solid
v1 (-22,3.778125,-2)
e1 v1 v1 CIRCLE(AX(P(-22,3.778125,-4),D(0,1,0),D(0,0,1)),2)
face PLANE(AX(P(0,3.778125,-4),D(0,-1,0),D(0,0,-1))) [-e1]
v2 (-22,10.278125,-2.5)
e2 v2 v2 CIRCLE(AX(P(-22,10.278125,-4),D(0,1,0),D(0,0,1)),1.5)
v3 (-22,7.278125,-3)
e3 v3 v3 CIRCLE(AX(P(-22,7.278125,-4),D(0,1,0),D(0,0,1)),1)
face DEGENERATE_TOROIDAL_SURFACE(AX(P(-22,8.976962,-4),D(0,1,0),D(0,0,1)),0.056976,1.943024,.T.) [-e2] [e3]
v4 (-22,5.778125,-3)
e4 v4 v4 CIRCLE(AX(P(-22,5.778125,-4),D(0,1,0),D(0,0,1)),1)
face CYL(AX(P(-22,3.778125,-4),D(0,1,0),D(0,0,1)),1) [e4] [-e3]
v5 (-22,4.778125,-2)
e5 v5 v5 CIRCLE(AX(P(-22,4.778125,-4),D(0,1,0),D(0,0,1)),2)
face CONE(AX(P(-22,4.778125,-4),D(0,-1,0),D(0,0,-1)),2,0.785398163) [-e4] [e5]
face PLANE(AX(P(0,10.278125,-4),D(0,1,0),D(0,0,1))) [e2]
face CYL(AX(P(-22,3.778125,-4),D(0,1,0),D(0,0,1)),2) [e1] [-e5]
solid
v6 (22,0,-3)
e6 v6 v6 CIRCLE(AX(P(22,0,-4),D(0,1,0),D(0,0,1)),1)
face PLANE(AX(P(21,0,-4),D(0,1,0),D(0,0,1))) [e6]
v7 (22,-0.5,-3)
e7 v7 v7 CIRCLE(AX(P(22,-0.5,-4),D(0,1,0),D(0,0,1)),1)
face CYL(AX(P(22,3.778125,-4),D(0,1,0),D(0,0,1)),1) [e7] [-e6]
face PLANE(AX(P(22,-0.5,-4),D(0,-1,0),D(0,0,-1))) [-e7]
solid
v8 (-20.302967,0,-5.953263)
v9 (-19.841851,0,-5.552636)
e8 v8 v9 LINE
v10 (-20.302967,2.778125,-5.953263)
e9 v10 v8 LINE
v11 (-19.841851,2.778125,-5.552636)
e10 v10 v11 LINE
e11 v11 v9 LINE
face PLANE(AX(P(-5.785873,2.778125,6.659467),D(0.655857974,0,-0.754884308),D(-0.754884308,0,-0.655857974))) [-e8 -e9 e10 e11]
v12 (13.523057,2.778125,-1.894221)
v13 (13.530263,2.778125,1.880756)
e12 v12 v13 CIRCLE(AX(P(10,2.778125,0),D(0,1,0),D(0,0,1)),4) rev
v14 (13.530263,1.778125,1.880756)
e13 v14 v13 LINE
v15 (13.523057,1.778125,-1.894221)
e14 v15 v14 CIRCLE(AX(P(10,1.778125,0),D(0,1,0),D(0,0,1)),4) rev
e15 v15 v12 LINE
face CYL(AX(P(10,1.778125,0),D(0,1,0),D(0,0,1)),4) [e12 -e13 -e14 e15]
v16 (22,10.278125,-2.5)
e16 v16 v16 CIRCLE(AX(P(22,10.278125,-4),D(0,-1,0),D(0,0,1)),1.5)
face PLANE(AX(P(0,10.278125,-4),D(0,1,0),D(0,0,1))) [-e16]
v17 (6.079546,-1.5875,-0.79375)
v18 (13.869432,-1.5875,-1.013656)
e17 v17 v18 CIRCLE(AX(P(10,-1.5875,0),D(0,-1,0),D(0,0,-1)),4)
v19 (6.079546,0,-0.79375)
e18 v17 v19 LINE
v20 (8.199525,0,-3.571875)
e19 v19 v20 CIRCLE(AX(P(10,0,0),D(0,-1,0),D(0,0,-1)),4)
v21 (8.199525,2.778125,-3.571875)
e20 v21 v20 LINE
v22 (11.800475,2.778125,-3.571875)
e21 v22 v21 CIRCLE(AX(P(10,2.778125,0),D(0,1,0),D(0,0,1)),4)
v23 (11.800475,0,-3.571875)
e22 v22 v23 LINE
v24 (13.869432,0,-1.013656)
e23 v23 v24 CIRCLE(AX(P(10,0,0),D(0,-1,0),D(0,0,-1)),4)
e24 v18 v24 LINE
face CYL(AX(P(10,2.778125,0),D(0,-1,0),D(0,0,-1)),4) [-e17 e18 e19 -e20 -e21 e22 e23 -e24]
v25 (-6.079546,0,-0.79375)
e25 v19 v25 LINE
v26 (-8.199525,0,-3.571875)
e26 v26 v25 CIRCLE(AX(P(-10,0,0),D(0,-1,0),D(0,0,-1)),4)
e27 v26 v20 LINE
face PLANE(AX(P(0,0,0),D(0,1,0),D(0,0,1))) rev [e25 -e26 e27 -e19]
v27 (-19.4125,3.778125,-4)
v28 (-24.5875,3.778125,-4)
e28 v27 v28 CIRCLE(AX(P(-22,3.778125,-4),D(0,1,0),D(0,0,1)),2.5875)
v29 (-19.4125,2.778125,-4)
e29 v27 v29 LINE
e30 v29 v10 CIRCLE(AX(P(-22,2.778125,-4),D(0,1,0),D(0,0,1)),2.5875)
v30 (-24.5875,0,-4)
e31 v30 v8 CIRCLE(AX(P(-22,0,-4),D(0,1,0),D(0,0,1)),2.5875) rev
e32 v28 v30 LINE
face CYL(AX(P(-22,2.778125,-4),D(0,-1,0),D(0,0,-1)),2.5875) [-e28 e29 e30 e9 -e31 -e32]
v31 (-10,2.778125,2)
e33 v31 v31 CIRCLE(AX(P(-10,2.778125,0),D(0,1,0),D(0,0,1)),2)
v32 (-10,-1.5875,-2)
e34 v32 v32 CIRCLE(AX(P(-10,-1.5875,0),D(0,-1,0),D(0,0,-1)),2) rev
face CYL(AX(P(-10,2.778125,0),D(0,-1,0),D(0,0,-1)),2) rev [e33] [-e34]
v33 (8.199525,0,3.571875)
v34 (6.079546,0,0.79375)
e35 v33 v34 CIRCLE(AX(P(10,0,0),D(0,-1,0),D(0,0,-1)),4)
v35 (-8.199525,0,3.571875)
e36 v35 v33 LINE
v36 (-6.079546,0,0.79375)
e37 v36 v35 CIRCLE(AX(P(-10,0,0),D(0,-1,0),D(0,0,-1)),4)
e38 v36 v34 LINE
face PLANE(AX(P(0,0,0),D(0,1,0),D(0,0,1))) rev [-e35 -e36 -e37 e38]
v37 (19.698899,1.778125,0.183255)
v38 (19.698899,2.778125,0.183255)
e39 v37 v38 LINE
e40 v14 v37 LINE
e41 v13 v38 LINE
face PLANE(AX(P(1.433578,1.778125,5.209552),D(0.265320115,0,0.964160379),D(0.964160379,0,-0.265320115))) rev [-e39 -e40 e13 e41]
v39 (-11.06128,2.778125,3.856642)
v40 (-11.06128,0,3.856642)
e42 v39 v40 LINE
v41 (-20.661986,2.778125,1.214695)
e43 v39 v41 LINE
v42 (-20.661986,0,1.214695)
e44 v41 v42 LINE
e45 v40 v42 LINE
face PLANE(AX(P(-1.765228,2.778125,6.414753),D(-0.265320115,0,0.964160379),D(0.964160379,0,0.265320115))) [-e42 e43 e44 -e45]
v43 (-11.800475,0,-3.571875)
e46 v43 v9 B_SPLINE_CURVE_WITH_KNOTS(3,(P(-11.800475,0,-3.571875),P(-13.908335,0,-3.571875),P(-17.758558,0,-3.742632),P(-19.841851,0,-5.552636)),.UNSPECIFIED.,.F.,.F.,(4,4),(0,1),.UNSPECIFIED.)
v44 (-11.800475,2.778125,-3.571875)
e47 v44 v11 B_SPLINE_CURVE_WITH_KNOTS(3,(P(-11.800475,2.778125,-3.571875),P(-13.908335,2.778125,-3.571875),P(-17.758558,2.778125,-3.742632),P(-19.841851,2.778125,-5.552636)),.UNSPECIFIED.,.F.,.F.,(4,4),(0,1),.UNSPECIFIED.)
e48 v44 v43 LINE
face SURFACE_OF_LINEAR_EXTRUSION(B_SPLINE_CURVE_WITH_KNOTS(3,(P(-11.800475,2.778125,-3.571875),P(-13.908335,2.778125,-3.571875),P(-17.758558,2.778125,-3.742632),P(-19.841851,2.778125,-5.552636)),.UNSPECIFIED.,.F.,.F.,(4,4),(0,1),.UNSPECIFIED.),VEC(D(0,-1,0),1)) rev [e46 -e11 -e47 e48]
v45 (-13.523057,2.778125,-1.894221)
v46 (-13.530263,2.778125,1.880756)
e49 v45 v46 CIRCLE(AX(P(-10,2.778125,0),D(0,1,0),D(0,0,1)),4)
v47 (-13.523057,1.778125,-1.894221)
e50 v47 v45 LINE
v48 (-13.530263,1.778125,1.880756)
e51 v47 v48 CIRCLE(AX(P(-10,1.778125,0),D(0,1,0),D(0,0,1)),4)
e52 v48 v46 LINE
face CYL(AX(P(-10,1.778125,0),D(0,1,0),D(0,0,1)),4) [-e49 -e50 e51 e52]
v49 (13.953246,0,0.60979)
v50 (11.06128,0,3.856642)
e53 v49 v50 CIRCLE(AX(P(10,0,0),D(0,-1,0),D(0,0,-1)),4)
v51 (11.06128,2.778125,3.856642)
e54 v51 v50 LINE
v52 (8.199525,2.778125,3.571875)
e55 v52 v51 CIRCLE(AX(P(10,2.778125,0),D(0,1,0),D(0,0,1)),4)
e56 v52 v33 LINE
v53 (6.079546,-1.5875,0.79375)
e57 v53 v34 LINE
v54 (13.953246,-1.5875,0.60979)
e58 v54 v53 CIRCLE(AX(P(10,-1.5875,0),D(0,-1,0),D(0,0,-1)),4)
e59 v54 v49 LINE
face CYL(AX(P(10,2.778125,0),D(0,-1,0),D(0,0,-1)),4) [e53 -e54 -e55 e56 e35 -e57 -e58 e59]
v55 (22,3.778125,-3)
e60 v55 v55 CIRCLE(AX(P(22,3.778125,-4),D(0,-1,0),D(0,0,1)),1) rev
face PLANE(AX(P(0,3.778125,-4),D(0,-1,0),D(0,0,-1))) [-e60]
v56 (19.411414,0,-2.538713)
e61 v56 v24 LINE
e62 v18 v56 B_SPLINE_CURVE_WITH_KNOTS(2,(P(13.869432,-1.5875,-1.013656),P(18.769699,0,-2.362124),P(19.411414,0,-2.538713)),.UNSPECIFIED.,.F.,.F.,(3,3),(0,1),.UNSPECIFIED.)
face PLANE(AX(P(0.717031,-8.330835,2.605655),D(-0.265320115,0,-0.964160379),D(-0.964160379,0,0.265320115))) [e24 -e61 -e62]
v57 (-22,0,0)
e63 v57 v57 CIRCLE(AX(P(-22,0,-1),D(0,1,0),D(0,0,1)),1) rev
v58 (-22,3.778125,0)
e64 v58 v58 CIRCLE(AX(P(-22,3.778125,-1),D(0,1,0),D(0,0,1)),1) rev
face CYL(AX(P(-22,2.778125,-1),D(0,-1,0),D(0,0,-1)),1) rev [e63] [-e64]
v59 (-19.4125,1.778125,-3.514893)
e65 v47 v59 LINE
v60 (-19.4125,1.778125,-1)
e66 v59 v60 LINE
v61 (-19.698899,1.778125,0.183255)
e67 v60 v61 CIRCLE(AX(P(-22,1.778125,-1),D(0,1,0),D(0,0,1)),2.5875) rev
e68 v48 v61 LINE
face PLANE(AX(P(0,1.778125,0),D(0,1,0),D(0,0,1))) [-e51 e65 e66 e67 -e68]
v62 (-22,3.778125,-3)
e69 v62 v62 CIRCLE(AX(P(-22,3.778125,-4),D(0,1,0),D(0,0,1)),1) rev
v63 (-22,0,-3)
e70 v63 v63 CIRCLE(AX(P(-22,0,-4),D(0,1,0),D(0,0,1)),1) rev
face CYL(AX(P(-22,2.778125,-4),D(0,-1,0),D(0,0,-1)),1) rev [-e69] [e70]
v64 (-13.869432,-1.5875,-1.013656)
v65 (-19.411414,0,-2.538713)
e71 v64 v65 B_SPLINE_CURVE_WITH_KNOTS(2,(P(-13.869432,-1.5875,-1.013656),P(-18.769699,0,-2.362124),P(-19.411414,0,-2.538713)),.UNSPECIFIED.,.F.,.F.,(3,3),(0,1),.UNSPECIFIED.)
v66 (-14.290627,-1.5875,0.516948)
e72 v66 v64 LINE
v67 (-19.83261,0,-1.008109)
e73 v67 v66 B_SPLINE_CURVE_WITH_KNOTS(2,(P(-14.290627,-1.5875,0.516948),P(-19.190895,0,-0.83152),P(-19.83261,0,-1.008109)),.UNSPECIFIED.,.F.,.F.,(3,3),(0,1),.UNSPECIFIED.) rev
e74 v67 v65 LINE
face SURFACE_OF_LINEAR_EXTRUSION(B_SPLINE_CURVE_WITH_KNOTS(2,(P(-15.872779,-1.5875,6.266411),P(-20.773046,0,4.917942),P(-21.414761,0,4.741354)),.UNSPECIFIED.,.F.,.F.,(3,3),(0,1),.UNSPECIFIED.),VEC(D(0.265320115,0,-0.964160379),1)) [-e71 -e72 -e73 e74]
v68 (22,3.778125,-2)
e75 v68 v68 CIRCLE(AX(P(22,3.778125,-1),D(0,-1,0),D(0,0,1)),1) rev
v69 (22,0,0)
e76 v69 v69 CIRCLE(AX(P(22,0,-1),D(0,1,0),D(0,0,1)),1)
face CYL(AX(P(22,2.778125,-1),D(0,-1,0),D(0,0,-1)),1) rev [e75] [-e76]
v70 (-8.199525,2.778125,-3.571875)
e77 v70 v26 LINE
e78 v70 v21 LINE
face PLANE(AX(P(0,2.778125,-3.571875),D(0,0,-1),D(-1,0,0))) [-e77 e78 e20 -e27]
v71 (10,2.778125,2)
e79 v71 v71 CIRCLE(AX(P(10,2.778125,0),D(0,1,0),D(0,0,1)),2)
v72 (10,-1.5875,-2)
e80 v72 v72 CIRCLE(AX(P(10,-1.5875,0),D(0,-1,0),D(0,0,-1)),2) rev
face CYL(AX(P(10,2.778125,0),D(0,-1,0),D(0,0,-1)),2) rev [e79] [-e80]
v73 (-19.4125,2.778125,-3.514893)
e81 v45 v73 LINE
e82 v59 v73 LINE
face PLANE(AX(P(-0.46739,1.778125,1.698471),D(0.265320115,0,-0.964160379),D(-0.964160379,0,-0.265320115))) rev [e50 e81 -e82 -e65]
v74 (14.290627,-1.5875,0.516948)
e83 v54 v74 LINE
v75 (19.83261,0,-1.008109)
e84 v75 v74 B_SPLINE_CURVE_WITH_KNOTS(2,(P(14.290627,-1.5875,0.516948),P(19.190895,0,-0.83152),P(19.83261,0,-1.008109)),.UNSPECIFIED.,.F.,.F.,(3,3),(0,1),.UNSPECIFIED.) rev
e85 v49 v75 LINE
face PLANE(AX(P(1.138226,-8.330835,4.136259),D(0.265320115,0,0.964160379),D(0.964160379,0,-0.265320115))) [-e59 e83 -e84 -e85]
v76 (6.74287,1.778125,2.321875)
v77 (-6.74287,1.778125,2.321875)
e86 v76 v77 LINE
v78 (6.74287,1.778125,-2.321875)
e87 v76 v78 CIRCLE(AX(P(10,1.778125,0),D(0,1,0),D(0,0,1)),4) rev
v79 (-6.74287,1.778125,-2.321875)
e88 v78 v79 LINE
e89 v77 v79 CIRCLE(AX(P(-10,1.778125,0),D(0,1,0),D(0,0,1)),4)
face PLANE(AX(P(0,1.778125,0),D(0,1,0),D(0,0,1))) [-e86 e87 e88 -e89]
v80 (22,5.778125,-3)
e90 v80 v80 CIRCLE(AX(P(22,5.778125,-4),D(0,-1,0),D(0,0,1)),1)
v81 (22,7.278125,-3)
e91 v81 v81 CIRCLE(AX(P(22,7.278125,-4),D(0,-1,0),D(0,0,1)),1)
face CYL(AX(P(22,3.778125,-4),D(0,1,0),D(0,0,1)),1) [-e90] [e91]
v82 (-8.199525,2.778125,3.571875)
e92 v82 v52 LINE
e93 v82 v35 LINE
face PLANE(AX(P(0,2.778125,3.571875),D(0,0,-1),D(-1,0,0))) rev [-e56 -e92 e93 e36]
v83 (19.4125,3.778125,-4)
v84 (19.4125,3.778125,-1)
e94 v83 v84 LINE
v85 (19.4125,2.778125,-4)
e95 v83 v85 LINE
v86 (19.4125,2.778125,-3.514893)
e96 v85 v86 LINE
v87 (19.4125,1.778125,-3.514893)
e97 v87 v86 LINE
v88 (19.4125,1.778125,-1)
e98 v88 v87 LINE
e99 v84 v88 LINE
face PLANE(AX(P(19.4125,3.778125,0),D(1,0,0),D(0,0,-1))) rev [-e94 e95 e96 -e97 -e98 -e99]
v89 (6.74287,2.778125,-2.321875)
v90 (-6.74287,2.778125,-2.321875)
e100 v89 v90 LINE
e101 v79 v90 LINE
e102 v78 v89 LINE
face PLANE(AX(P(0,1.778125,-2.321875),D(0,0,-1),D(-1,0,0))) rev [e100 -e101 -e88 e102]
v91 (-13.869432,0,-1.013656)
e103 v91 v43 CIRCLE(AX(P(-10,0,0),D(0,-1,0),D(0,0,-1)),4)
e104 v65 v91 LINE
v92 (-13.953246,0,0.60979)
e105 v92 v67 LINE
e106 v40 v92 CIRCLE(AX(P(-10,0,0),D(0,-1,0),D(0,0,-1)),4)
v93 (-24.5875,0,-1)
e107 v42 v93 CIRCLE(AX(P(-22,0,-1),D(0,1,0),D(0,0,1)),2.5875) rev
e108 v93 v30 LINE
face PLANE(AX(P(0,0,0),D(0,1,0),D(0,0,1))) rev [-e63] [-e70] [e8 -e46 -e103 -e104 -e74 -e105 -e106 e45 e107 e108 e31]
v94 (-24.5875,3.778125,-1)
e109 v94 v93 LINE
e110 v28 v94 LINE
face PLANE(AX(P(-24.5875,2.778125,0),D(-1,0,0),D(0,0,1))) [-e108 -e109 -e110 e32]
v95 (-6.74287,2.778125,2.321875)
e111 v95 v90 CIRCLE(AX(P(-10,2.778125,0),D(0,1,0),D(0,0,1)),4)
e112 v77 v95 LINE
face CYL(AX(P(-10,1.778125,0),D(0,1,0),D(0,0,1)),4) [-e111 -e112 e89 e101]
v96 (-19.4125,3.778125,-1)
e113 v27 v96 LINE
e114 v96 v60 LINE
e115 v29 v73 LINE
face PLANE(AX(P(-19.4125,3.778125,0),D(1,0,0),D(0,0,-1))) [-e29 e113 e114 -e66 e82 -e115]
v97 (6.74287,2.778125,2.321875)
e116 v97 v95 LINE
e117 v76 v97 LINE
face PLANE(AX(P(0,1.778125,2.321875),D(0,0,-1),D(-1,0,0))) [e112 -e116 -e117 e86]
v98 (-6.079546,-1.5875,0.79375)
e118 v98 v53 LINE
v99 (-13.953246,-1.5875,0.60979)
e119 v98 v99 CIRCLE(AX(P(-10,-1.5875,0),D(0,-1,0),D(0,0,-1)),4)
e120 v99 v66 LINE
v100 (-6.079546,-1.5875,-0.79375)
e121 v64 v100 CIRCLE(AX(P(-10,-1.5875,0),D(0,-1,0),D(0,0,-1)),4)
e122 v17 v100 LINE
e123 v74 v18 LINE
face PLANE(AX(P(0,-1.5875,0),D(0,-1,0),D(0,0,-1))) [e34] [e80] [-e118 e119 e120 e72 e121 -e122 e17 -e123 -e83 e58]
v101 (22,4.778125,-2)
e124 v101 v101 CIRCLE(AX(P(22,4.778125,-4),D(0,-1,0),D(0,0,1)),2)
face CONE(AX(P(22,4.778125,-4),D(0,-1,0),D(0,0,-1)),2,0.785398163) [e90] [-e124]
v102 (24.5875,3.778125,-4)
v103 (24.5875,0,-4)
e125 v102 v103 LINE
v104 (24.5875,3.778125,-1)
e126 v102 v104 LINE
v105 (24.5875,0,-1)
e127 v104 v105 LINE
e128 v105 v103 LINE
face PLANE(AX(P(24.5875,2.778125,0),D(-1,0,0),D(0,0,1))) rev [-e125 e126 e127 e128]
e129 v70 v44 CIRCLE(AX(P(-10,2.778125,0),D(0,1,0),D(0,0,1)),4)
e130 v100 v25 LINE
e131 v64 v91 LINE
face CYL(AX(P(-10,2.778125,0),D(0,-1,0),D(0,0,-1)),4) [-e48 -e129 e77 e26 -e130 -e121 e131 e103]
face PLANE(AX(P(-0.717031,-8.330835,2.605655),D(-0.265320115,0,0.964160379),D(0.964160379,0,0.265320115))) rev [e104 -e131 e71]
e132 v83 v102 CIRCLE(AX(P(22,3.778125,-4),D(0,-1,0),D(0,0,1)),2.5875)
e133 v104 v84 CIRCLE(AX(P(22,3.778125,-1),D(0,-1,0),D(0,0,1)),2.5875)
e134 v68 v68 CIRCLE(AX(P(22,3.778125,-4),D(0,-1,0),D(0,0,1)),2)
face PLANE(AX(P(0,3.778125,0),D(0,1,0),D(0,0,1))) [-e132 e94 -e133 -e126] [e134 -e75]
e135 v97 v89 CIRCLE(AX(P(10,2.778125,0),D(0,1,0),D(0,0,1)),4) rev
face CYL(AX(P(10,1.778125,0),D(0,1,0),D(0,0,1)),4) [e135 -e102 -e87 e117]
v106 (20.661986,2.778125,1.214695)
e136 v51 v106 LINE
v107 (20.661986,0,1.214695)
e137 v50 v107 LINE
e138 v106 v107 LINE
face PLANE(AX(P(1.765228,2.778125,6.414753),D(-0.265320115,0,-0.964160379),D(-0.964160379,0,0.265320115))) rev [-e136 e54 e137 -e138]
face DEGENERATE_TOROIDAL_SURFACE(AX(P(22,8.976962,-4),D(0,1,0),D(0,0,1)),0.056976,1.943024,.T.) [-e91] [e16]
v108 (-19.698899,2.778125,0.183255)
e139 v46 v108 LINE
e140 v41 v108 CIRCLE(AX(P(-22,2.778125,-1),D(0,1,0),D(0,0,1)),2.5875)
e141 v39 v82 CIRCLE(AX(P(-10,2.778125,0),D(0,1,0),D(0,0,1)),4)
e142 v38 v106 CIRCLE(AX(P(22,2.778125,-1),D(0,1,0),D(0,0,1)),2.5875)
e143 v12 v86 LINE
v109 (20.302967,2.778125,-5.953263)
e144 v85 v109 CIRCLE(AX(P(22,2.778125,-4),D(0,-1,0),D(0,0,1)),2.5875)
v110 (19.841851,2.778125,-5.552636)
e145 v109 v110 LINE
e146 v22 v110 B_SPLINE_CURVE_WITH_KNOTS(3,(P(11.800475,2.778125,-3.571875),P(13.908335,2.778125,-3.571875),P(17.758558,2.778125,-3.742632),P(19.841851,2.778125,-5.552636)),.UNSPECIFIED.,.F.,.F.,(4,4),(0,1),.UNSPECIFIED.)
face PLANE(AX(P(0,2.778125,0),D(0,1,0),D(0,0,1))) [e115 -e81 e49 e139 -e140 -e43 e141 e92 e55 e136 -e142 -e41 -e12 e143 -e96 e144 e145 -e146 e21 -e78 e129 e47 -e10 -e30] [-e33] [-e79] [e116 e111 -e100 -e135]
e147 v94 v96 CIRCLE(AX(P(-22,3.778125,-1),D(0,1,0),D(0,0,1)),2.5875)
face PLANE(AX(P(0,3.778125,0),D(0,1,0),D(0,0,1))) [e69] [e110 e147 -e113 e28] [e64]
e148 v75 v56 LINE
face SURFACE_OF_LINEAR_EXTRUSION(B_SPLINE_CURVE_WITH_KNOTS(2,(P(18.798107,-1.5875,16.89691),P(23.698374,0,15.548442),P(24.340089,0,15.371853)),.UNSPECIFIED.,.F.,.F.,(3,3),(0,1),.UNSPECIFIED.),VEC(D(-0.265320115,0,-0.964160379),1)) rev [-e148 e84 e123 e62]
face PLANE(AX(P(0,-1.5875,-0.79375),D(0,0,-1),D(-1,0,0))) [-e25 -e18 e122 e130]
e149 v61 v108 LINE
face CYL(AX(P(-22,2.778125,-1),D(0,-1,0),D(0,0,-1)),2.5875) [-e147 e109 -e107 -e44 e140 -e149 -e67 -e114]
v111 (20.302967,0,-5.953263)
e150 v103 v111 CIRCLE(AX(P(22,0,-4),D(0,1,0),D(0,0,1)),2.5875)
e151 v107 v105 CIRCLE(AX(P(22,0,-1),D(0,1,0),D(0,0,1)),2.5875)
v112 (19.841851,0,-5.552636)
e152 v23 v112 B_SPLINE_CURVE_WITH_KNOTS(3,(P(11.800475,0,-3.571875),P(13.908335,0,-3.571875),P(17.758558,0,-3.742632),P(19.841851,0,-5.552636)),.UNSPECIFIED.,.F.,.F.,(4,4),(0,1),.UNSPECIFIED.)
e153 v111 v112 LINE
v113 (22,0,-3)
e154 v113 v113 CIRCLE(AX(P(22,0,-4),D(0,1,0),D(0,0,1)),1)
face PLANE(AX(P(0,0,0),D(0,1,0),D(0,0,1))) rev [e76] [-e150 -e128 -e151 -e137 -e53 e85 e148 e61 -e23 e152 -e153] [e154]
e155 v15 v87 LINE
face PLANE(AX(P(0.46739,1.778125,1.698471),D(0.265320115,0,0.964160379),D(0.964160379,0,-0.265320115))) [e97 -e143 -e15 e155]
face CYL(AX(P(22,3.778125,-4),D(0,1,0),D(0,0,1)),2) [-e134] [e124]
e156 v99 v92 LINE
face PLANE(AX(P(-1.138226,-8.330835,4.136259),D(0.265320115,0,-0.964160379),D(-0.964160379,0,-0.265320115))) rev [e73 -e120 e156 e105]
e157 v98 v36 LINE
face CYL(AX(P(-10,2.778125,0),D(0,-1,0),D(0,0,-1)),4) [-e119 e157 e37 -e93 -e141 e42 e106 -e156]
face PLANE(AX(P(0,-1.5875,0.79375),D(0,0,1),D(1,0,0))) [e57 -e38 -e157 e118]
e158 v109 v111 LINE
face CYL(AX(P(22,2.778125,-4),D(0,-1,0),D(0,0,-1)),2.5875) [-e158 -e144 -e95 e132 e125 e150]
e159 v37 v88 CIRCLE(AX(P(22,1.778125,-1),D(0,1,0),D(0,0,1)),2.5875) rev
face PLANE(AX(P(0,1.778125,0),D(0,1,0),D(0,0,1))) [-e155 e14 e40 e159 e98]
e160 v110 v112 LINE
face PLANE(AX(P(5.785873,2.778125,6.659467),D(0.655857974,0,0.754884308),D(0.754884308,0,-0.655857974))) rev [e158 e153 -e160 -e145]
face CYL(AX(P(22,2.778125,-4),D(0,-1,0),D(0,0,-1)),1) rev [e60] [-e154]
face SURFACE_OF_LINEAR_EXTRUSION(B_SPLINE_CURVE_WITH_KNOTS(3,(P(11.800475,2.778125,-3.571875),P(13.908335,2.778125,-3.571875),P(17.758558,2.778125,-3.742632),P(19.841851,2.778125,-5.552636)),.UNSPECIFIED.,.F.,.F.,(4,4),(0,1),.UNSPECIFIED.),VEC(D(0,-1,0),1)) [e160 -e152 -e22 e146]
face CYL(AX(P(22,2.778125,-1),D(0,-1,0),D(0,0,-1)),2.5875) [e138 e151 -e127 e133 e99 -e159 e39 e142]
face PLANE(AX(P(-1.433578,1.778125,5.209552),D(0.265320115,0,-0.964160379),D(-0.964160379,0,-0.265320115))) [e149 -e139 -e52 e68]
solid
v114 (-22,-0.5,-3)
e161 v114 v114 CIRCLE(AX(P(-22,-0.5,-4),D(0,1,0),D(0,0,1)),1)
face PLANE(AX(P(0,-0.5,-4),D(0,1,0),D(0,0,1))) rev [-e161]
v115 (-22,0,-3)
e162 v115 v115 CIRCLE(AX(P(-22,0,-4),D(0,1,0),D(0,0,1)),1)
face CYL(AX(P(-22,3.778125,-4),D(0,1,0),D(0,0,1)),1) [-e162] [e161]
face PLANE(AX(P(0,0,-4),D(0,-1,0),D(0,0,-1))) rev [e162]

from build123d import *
from build123d.topology import SkipClean

# Parameters (mm, degrees)
SKETCH1_R           = 1
SKETCH1_R_2         = 2
BOSS_EXTRUDE1_DEPTH = 2.778125
SKETCH2_R           = 1
BOSS_EXTRUDE2_DEPTH = 1
CUT_EXTRUDE1_START  = -1
CUT_EXTRUDE1_DEPTH  = 1
BOSS_EXTRUDE3_START = 1.5875
SKETCH4_R           = 2
BOSS_EXTRUDE3_DEPTH = 1.5875
BOSS_EXTRUDE4_START = 1.5875
BOSS_EXTRUDE4_DEPTH = 1.5875
CUT_EXTRUDE2_DEPTH  = 1.5875
SKETCH7_W           = 1
SKETCH7_H           = 0.5
SKETCH8_W           = 1
SKETCH8_H           = 0.5


# Read off the part's stored shape, not the designer's step: Mirror3
with BuildPart() as part:
    # Sketch1 → Boss-Extrude1 (new body)
    with BuildSketch(Plane(origin=(0, 0, 0), x_dir=(1, 0, 0), z_dir=(0, 1, 0))):
        with BuildLine():
            ThreePointArc((20.661985619, -1.21469496), (23.271425192, -1.253582532), (24.5875, 1))
            Line((24.5875, 1), (24.5875, 4))
            ThreePointArc((24.5875, 4), (23.073332343, 6.354381858), (20.302967493, 5.953263146))
            Line((20.302967493, 5.953263146), (19.841851108, 5.552636382))
            add(Edge.make_bspline(
                [(11.800474655, 3.571875), (13.90833466, 3.571875), (17.75855835, 3.742631652), (19.841851108, 5.552636382)],
                knots=[0, 0, 0, 0, 1, 1, 1, 1], degree=3))
            ThreePointArc((11.800474655, 3.571875), (10, 4), (8.199525345, 3.571875))
            Line((8.199525345, 3.571875), (-8.199525345, 3.571875))
            ThreePointArc((-8.199525345, 3.571875), (-10, 4), (-11.800474655, 3.571875))
            add(Edge.make_bspline(
                [(-11.800474655, 3.571875), (-13.90833466, 3.571875), (-17.75855835, 3.742631652), (-19.841851108, 5.552636382)],
                knots=[0, 0, 0, 0, 1, 1, 1, 1], degree=3))
            Line((-19.841851108, 5.552636382), (-20.302967493, 5.953263146))
            ThreePointArc((-20.302967493, 5.953263146), (-23.073332343, 6.354381858), (-24.5875, 4))
            Line((-24.5875, 4), (-24.5875, 1))
            ThreePointArc((-24.5875, 1), (-23.271425192, -1.253582532), (-20.661985619, -1.21469496))
            Line((-20.661985619, -1.21469496), (-11.061280458, -3.856641517))
            ThreePointArc((-11.061280458, -3.856641517), (-9.603925503, -3.980342321), (-8.199525345, -3.571875))
            Line((-8.199525345, -3.571875), (8.199525345, -3.571875))
            ThreePointArc((8.199525345, -3.571875), (9.603925503, -3.980342321), (11.061280458, -3.856641517))
            Line((11.061280458, -3.856641517), (20.661985619, -1.21469496))
        make_face()
        with Locations(Location((-22, 1, 0), (0, 0, 270))):
            Circle(SKETCH1_R, mode=Mode.SUBTRACT)
        with Locations(Location((-10, 0, 0), (0, 0, 270))):
            Circle(SKETCH1_R_2, mode=Mode.SUBTRACT)
        with Locations(Location((10, 0, 0), (0, 0, 270))):
            Circle(SKETCH1_R_2, mode=Mode.SUBTRACT)
        with Locations(Location((-22, 4, 0), (0, 0, 270))):
            Circle(SKETCH1_R, mode=Mode.SUBTRACT)
        with Locations(Location((22, 1, 0), (0, 0, 270))):
            Circle(SKETCH1_R, mode=Mode.SUBTRACT)
        with Locations(Location((22, 4, 0), (0, 0, 270))):
            Circle(SKETCH1_R, mode=Mode.SUBTRACT)
    extrude(amount=BOSS_EXTRUDE1_DEPTH)

    # Sketch2 → Boss-Extrude2 (add)
    with BuildSketch(Plane(origin=(0, 2.778125, 0), x_dir=(1, 0, 0), z_dir=(0, 1, 0))):
        with BuildLine():
            ThreePointArc((-24.5875, 1), (-22, -1.5875), (-19.4125, 1))
            Line((-19.4125, 1), (-19.4125, 4))
            ThreePointArc((-19.4125, 4), (-22, 6.5875), (-24.5875, 4))
            Line((-24.5875, 4), (-24.5875, 1))
        make_face()
        with Locations((-22, 1)):
            Circle(SKETCH2_R, mode=Mode.SUBTRACT)
        with Locations((-22, 4)):
            Circle(SKETCH2_R, mode=Mode.SUBTRACT)
    boss_extrude2 = extrude(amount=BOSS_EXTRUDE2_DEPTH)

    # Mirror1: Boss-Extrude2 across plane
    with SkipClean():  # the faces are left unmerged after this step: merging them gives an invalid solid
        add(boss_extrude2.mirror(Plane(origin=(0, 0, 0), x_dir=(0, 0, 1), z_dir=(1, 0, 0))))

    # Sketch3 → Cut-Extrude1 (cut)
    with SkipClean():  # the faces are left unmerged after this step: merging them gives an invalid solid
        with BuildSketch(Plane(origin=(0, 2.778125, 0), x_dir=(1, 0, 0), z_dir=(0, 1, 0)).offset(CUT_EXTRUDE1_START)):
            with BuildLine():
                Line((-19.698899277, -0.183254711), (-13.530263134, -1.880755754))
                ThreePointArc((-13.530263134, -1.880755754), (-13.999992711, 0.007636121), (-13.523056576, 1.89422078))
                Line((-13.523056576, 1.89422078), (-19.4125, 3.514892857))
                Line((-19.4125, 3.514892857), (-19.4125, 1))
                ThreePointArc((-19.4125, 1), (-19.485118853, 0.391289014), (-19.698899277, -0.183254711))
            make_face()
            with BuildLine():
                ThreePointArc((-6.742869901, 2.321875), (-6, 0), (-6.742869901, -2.321875))
                Line((-6.742869901, -2.321875), (6.742869901, -2.321875))
                ThreePointArc((6.742869901, -2.321875), (6, 0), (6.742869901, 2.321875))
                Line((6.742869901, 2.321875), (-6.742869901, 2.321875))
            make_face()
            with BuildLine():
                ThreePointArc((13.523056576, 1.89422078), (13.999992711, 0.007636121), (13.530263134, -1.880755754))
                Line((13.530263134, -1.880755754), (19.698899277, -0.183254711))
                ThreePointArc((19.698899277, -0.183254711), (19.485118853, 0.391289014), (19.4125, 1))
                Line((19.4125, 1), (19.4125, 3.514892857))
                Line((19.4125, 3.514892857), (13.523056576, 1.89422078))
            make_face()
        extrude(amount=CUT_EXTRUDE1_DEPTH, mode=Mode.SUBTRACT)

    # Sketch4 → Boss-Extrude3 (add)
    # profile 1 of 4: a face of its own
    with SkipClean():  # the faces are left unmerged after this step: merging them gives an invalid solid
        with BuildSketch(Plane.XZ.offset(BOSS_EXTRUDE3_START)):
            with BuildLine():
                ThreePointArc((-6, 0), (-6.019936137, 0.398862947), (-6.079545825, 0.79375))
                ThreePointArc((-6.079545825, 0.79375), (-6.820101999, 2.426571388), (-8.199525345, 3.571875))
                ThreePointArc((-8.199525345, 3.571875), (-9.603925503, 3.980342321), (-11.061280458, 3.856641517))
                ThreePointArc((-11.061280458, 3.856641517), (-13.980342321, 0.396074497), (-11.800474655, -3.571875))
                ThreePointArc((-11.800474655, -3.571875), (-10, -4), (-8.199525345, -3.571875))
                ThreePointArc((-8.199525345, -3.571875), (-6.820101999, -2.426571388), (-6.079545825, -0.79375))
                ThreePointArc((-6.079545825, -0.79375), (-6.019936137, -0.398862947), (-6, 0))
            make_face()
            with Locations(Location((-10, 0, 0), (0, 0, 270))):
                Circle(SKETCH4_R, mode=Mode.SUBTRACT)
        # profile 2 of 4: a face of its own
        with BuildSketch(Plane.XZ.offset(BOSS_EXTRUDE3_START)):
            with BuildLine():
                Line((0, 0.79375), (-6.079545825, 0.79375))
                ThreePointArc((-6.079545825, 0.79375), (-6.019936137, 0.398862947), (-6, 0))
                ThreePointArc((-6, 0), (-6.019936137, -0.398862947), (-6.079545825, -0.79375))
                Line((-6.079545825, -0.79375), (0, -0.79375))
                Line((0, -0.79375), (0, 0.79375))
            make_face()
        # profile 3 of 4: a face of its own
        with BuildSketch(Plane.XZ.offset(BOSS_EXTRUDE3_START)):
            with BuildLine():
                Line((6.079545825, 0.79375), (0, 0.79375))
                Line((0, 0.79375), (0, -0.79375))
                Line((0, -0.79375), (6.079545825, -0.79375))
                ThreePointArc((6.079545825, -0.79375), (6, 0), (6.079545825, 0.79375))
            make_face()
        # profile 4 of 4: a face of its own
        with BuildSketch(Plane.XZ.offset(BOSS_EXTRUDE3_START)):
            with BuildLine():
                ThreePointArc((8.199525345, 3.571875), (6.820101999, 2.426571388), (6.079545825, 0.79375))
                ThreePointArc((6.079545825, 0.79375), (6, 0), (6.079545825, -0.79375))
                ThreePointArc((6.079545825, -0.79375), (6.820101999, -2.426571388), (8.199525345, -3.571875))
                ThreePointArc((8.199525345, -3.571875), (10, -4), (11.800474655, -3.571875))
                ThreePointArc((11.800474655, -3.571875), (13.406016634, -2.097391401), (14, 0))
                ThreePointArc((14, 0), (13.181597227, 2.424343021), (11.061280458, 3.856641517))
                ThreePointArc((11.061280458, 3.856641517), (9.603925503, 3.980342321), (8.199525345, 3.571875))
            make_face()
            with Locations(Location((10, 0, 0), (0, 0, 270))):
                Circle(SKETCH4_R, mode=Mode.SUBTRACT)
        extrude(amount=-BOSS_EXTRUDE3_DEPTH)

    # Sketch5 → Boss-Extrude4 (add)
    with SkipClean():  # the faces are left unmerged after this step: merging them gives an invalid solid
        with BuildSketch(Plane.XZ.offset(BOSS_EXTRUDE4_START)):
            with BuildLine():
                ThreePointArc((-13.869431572, -1.013656406), (-13.994679794, -0.206236131), (-13.953246353, 0.609789534))
                Line((-13.953246353, 0.609789534), (-19.832609512, -1.00810863))
                Line((-19.832609512, -1.00810863), (-19.41141383, -2.538713232))
                Line((-19.41141383, -2.538713232), (-13.869431572, -1.013656406))
            make_face()
        boss_extrude4 = extrude(amount=-BOSS_EXTRUDE4_DEPTH)

    # Sketch6 → Cut-Extrude2 (cut)
    with SkipClean():  # the faces are left unmerged after this step: merging them gives an invalid solid
        with BuildSketch(Plane(origin=(-0.717030749, 0, 2.605654831), x_dir=(-0.964160379177711, 0, -0.26532011462362337), z_dir=(0.2653201146236233, 0, -0.9641603791777109))):
            with BuildLine():
                add(Edge.make_bspline(
                    [(13.641299837, -1.5875), (18.723719218, 0), (19.389287804, 0)],
                    knots=[0, 0, 0, 1, 1, 1], degree=2))
                Line((19.389287804, 0), (19.389287804, -1.5875))
                Line((19.389287804, -1.5875), (13.641299837, -1.5875))
            make_face()
        cut_extrude2 = extrude(amount=-CUT_EXTRUDE2_DEPTH, mode=Mode.SUBTRACT)

    # Mirror2: Boss-Extrude4, Cut-Extrude2 across plane
    with SkipClean():  # the faces are left unmerged after this step: merging them gives an invalid solid
        add(boss_extrude4.mirror(Plane(origin=(0, 0, 0), x_dir=(0, 0, 1), z_dir=(1, 0, 0))))
        add(cut_extrude2.mirror(Plane(origin=(0, 0, 0), x_dir=(0, 0, 1), z_dir=(1, 0, 0))), mode=Mode.SUBTRACT)

    # Mirror3 outline → Mirror3 (revolve)
    with SkipClean():  # the faces are left unmerged after this step: merging them gives an invalid solid
        with BuildSketch(Plane(origin=(22, 0, -4), x_dir=(1, 0, 0), z_dir=(0, 0, 1))):
            with BuildLine():
                Line((0, 10.278125), (0, 3.778125))
                Line((0, 3.778125), (2, 3.778125))
                Line((2, 3.778125), (2, 4.778125))
                Line((2, 4.778125), (1, 5.778125))
                Line((1, 5.778125), (1, 7.278125))
                ThreePointArc((1, 7.278125), (1.973563065, 8.657531156), (1.5, 10.278125))
                Line((1.5, 10.278125), (0, 10.278125))
            make_face()
        revolve(axis=Axis((22, 0, -4), (0, 1, 0)))


with BuildPart() as body_2:
    # Sketch7 → Revolve1 (revolve)
    with BuildSketch(Plane.XY.offset(-4), mode=Mode.PRIVATE) as revolve1_sk:
        with BuildLine():
            Line((-22, 10.278125), (-23.5, 10.278125))
            ThreePointArc((-23.5, 10.278125), (-23.973563065, 8.657531156), (-23, 7.278125))
            Line((-23, 7.278125), (-23, 5.778125))
            Line((-23, 5.778125), (-24, 4.778125))
            Line((-24, 4.778125), (-24, 3.778125))
            Line((-24, 3.778125), (-22, 3.778125))
            Line((-22, 3.778125), (-22, 10.278125))
        make_face()
        with Locations((-22.5, -0.25)):
            Rectangle(SKETCH7_W, SKETCH7_H)
    revolve(revolve1_sk.sketch.rotate(Axis((-22, 3.778125, -4), (0, -1, 0)), 270), axis=Axis((-22, 3.778125, -4), (0, -1, 0)))


with BuildPart() as body_3:
    # Sketch8 → Revolve2 (revolve)
    with BuildSketch(Plane.XY.offset(-4), mode=Mode.PRIVATE) as revolve2_sk:
        with Locations((21.5, -0.25)):
            Rectangle(SKETCH8_W, SKETCH8_H)
    revolve(revolve2_sk.sketch.rotate(Axis((22, 3.778125, -4), (0, -1, 0)), 270), axis=Axis((22, 3.778125, -4), (0, -1, 0)))


solid = Compound([part.part, body_2.part, body_3.part])
